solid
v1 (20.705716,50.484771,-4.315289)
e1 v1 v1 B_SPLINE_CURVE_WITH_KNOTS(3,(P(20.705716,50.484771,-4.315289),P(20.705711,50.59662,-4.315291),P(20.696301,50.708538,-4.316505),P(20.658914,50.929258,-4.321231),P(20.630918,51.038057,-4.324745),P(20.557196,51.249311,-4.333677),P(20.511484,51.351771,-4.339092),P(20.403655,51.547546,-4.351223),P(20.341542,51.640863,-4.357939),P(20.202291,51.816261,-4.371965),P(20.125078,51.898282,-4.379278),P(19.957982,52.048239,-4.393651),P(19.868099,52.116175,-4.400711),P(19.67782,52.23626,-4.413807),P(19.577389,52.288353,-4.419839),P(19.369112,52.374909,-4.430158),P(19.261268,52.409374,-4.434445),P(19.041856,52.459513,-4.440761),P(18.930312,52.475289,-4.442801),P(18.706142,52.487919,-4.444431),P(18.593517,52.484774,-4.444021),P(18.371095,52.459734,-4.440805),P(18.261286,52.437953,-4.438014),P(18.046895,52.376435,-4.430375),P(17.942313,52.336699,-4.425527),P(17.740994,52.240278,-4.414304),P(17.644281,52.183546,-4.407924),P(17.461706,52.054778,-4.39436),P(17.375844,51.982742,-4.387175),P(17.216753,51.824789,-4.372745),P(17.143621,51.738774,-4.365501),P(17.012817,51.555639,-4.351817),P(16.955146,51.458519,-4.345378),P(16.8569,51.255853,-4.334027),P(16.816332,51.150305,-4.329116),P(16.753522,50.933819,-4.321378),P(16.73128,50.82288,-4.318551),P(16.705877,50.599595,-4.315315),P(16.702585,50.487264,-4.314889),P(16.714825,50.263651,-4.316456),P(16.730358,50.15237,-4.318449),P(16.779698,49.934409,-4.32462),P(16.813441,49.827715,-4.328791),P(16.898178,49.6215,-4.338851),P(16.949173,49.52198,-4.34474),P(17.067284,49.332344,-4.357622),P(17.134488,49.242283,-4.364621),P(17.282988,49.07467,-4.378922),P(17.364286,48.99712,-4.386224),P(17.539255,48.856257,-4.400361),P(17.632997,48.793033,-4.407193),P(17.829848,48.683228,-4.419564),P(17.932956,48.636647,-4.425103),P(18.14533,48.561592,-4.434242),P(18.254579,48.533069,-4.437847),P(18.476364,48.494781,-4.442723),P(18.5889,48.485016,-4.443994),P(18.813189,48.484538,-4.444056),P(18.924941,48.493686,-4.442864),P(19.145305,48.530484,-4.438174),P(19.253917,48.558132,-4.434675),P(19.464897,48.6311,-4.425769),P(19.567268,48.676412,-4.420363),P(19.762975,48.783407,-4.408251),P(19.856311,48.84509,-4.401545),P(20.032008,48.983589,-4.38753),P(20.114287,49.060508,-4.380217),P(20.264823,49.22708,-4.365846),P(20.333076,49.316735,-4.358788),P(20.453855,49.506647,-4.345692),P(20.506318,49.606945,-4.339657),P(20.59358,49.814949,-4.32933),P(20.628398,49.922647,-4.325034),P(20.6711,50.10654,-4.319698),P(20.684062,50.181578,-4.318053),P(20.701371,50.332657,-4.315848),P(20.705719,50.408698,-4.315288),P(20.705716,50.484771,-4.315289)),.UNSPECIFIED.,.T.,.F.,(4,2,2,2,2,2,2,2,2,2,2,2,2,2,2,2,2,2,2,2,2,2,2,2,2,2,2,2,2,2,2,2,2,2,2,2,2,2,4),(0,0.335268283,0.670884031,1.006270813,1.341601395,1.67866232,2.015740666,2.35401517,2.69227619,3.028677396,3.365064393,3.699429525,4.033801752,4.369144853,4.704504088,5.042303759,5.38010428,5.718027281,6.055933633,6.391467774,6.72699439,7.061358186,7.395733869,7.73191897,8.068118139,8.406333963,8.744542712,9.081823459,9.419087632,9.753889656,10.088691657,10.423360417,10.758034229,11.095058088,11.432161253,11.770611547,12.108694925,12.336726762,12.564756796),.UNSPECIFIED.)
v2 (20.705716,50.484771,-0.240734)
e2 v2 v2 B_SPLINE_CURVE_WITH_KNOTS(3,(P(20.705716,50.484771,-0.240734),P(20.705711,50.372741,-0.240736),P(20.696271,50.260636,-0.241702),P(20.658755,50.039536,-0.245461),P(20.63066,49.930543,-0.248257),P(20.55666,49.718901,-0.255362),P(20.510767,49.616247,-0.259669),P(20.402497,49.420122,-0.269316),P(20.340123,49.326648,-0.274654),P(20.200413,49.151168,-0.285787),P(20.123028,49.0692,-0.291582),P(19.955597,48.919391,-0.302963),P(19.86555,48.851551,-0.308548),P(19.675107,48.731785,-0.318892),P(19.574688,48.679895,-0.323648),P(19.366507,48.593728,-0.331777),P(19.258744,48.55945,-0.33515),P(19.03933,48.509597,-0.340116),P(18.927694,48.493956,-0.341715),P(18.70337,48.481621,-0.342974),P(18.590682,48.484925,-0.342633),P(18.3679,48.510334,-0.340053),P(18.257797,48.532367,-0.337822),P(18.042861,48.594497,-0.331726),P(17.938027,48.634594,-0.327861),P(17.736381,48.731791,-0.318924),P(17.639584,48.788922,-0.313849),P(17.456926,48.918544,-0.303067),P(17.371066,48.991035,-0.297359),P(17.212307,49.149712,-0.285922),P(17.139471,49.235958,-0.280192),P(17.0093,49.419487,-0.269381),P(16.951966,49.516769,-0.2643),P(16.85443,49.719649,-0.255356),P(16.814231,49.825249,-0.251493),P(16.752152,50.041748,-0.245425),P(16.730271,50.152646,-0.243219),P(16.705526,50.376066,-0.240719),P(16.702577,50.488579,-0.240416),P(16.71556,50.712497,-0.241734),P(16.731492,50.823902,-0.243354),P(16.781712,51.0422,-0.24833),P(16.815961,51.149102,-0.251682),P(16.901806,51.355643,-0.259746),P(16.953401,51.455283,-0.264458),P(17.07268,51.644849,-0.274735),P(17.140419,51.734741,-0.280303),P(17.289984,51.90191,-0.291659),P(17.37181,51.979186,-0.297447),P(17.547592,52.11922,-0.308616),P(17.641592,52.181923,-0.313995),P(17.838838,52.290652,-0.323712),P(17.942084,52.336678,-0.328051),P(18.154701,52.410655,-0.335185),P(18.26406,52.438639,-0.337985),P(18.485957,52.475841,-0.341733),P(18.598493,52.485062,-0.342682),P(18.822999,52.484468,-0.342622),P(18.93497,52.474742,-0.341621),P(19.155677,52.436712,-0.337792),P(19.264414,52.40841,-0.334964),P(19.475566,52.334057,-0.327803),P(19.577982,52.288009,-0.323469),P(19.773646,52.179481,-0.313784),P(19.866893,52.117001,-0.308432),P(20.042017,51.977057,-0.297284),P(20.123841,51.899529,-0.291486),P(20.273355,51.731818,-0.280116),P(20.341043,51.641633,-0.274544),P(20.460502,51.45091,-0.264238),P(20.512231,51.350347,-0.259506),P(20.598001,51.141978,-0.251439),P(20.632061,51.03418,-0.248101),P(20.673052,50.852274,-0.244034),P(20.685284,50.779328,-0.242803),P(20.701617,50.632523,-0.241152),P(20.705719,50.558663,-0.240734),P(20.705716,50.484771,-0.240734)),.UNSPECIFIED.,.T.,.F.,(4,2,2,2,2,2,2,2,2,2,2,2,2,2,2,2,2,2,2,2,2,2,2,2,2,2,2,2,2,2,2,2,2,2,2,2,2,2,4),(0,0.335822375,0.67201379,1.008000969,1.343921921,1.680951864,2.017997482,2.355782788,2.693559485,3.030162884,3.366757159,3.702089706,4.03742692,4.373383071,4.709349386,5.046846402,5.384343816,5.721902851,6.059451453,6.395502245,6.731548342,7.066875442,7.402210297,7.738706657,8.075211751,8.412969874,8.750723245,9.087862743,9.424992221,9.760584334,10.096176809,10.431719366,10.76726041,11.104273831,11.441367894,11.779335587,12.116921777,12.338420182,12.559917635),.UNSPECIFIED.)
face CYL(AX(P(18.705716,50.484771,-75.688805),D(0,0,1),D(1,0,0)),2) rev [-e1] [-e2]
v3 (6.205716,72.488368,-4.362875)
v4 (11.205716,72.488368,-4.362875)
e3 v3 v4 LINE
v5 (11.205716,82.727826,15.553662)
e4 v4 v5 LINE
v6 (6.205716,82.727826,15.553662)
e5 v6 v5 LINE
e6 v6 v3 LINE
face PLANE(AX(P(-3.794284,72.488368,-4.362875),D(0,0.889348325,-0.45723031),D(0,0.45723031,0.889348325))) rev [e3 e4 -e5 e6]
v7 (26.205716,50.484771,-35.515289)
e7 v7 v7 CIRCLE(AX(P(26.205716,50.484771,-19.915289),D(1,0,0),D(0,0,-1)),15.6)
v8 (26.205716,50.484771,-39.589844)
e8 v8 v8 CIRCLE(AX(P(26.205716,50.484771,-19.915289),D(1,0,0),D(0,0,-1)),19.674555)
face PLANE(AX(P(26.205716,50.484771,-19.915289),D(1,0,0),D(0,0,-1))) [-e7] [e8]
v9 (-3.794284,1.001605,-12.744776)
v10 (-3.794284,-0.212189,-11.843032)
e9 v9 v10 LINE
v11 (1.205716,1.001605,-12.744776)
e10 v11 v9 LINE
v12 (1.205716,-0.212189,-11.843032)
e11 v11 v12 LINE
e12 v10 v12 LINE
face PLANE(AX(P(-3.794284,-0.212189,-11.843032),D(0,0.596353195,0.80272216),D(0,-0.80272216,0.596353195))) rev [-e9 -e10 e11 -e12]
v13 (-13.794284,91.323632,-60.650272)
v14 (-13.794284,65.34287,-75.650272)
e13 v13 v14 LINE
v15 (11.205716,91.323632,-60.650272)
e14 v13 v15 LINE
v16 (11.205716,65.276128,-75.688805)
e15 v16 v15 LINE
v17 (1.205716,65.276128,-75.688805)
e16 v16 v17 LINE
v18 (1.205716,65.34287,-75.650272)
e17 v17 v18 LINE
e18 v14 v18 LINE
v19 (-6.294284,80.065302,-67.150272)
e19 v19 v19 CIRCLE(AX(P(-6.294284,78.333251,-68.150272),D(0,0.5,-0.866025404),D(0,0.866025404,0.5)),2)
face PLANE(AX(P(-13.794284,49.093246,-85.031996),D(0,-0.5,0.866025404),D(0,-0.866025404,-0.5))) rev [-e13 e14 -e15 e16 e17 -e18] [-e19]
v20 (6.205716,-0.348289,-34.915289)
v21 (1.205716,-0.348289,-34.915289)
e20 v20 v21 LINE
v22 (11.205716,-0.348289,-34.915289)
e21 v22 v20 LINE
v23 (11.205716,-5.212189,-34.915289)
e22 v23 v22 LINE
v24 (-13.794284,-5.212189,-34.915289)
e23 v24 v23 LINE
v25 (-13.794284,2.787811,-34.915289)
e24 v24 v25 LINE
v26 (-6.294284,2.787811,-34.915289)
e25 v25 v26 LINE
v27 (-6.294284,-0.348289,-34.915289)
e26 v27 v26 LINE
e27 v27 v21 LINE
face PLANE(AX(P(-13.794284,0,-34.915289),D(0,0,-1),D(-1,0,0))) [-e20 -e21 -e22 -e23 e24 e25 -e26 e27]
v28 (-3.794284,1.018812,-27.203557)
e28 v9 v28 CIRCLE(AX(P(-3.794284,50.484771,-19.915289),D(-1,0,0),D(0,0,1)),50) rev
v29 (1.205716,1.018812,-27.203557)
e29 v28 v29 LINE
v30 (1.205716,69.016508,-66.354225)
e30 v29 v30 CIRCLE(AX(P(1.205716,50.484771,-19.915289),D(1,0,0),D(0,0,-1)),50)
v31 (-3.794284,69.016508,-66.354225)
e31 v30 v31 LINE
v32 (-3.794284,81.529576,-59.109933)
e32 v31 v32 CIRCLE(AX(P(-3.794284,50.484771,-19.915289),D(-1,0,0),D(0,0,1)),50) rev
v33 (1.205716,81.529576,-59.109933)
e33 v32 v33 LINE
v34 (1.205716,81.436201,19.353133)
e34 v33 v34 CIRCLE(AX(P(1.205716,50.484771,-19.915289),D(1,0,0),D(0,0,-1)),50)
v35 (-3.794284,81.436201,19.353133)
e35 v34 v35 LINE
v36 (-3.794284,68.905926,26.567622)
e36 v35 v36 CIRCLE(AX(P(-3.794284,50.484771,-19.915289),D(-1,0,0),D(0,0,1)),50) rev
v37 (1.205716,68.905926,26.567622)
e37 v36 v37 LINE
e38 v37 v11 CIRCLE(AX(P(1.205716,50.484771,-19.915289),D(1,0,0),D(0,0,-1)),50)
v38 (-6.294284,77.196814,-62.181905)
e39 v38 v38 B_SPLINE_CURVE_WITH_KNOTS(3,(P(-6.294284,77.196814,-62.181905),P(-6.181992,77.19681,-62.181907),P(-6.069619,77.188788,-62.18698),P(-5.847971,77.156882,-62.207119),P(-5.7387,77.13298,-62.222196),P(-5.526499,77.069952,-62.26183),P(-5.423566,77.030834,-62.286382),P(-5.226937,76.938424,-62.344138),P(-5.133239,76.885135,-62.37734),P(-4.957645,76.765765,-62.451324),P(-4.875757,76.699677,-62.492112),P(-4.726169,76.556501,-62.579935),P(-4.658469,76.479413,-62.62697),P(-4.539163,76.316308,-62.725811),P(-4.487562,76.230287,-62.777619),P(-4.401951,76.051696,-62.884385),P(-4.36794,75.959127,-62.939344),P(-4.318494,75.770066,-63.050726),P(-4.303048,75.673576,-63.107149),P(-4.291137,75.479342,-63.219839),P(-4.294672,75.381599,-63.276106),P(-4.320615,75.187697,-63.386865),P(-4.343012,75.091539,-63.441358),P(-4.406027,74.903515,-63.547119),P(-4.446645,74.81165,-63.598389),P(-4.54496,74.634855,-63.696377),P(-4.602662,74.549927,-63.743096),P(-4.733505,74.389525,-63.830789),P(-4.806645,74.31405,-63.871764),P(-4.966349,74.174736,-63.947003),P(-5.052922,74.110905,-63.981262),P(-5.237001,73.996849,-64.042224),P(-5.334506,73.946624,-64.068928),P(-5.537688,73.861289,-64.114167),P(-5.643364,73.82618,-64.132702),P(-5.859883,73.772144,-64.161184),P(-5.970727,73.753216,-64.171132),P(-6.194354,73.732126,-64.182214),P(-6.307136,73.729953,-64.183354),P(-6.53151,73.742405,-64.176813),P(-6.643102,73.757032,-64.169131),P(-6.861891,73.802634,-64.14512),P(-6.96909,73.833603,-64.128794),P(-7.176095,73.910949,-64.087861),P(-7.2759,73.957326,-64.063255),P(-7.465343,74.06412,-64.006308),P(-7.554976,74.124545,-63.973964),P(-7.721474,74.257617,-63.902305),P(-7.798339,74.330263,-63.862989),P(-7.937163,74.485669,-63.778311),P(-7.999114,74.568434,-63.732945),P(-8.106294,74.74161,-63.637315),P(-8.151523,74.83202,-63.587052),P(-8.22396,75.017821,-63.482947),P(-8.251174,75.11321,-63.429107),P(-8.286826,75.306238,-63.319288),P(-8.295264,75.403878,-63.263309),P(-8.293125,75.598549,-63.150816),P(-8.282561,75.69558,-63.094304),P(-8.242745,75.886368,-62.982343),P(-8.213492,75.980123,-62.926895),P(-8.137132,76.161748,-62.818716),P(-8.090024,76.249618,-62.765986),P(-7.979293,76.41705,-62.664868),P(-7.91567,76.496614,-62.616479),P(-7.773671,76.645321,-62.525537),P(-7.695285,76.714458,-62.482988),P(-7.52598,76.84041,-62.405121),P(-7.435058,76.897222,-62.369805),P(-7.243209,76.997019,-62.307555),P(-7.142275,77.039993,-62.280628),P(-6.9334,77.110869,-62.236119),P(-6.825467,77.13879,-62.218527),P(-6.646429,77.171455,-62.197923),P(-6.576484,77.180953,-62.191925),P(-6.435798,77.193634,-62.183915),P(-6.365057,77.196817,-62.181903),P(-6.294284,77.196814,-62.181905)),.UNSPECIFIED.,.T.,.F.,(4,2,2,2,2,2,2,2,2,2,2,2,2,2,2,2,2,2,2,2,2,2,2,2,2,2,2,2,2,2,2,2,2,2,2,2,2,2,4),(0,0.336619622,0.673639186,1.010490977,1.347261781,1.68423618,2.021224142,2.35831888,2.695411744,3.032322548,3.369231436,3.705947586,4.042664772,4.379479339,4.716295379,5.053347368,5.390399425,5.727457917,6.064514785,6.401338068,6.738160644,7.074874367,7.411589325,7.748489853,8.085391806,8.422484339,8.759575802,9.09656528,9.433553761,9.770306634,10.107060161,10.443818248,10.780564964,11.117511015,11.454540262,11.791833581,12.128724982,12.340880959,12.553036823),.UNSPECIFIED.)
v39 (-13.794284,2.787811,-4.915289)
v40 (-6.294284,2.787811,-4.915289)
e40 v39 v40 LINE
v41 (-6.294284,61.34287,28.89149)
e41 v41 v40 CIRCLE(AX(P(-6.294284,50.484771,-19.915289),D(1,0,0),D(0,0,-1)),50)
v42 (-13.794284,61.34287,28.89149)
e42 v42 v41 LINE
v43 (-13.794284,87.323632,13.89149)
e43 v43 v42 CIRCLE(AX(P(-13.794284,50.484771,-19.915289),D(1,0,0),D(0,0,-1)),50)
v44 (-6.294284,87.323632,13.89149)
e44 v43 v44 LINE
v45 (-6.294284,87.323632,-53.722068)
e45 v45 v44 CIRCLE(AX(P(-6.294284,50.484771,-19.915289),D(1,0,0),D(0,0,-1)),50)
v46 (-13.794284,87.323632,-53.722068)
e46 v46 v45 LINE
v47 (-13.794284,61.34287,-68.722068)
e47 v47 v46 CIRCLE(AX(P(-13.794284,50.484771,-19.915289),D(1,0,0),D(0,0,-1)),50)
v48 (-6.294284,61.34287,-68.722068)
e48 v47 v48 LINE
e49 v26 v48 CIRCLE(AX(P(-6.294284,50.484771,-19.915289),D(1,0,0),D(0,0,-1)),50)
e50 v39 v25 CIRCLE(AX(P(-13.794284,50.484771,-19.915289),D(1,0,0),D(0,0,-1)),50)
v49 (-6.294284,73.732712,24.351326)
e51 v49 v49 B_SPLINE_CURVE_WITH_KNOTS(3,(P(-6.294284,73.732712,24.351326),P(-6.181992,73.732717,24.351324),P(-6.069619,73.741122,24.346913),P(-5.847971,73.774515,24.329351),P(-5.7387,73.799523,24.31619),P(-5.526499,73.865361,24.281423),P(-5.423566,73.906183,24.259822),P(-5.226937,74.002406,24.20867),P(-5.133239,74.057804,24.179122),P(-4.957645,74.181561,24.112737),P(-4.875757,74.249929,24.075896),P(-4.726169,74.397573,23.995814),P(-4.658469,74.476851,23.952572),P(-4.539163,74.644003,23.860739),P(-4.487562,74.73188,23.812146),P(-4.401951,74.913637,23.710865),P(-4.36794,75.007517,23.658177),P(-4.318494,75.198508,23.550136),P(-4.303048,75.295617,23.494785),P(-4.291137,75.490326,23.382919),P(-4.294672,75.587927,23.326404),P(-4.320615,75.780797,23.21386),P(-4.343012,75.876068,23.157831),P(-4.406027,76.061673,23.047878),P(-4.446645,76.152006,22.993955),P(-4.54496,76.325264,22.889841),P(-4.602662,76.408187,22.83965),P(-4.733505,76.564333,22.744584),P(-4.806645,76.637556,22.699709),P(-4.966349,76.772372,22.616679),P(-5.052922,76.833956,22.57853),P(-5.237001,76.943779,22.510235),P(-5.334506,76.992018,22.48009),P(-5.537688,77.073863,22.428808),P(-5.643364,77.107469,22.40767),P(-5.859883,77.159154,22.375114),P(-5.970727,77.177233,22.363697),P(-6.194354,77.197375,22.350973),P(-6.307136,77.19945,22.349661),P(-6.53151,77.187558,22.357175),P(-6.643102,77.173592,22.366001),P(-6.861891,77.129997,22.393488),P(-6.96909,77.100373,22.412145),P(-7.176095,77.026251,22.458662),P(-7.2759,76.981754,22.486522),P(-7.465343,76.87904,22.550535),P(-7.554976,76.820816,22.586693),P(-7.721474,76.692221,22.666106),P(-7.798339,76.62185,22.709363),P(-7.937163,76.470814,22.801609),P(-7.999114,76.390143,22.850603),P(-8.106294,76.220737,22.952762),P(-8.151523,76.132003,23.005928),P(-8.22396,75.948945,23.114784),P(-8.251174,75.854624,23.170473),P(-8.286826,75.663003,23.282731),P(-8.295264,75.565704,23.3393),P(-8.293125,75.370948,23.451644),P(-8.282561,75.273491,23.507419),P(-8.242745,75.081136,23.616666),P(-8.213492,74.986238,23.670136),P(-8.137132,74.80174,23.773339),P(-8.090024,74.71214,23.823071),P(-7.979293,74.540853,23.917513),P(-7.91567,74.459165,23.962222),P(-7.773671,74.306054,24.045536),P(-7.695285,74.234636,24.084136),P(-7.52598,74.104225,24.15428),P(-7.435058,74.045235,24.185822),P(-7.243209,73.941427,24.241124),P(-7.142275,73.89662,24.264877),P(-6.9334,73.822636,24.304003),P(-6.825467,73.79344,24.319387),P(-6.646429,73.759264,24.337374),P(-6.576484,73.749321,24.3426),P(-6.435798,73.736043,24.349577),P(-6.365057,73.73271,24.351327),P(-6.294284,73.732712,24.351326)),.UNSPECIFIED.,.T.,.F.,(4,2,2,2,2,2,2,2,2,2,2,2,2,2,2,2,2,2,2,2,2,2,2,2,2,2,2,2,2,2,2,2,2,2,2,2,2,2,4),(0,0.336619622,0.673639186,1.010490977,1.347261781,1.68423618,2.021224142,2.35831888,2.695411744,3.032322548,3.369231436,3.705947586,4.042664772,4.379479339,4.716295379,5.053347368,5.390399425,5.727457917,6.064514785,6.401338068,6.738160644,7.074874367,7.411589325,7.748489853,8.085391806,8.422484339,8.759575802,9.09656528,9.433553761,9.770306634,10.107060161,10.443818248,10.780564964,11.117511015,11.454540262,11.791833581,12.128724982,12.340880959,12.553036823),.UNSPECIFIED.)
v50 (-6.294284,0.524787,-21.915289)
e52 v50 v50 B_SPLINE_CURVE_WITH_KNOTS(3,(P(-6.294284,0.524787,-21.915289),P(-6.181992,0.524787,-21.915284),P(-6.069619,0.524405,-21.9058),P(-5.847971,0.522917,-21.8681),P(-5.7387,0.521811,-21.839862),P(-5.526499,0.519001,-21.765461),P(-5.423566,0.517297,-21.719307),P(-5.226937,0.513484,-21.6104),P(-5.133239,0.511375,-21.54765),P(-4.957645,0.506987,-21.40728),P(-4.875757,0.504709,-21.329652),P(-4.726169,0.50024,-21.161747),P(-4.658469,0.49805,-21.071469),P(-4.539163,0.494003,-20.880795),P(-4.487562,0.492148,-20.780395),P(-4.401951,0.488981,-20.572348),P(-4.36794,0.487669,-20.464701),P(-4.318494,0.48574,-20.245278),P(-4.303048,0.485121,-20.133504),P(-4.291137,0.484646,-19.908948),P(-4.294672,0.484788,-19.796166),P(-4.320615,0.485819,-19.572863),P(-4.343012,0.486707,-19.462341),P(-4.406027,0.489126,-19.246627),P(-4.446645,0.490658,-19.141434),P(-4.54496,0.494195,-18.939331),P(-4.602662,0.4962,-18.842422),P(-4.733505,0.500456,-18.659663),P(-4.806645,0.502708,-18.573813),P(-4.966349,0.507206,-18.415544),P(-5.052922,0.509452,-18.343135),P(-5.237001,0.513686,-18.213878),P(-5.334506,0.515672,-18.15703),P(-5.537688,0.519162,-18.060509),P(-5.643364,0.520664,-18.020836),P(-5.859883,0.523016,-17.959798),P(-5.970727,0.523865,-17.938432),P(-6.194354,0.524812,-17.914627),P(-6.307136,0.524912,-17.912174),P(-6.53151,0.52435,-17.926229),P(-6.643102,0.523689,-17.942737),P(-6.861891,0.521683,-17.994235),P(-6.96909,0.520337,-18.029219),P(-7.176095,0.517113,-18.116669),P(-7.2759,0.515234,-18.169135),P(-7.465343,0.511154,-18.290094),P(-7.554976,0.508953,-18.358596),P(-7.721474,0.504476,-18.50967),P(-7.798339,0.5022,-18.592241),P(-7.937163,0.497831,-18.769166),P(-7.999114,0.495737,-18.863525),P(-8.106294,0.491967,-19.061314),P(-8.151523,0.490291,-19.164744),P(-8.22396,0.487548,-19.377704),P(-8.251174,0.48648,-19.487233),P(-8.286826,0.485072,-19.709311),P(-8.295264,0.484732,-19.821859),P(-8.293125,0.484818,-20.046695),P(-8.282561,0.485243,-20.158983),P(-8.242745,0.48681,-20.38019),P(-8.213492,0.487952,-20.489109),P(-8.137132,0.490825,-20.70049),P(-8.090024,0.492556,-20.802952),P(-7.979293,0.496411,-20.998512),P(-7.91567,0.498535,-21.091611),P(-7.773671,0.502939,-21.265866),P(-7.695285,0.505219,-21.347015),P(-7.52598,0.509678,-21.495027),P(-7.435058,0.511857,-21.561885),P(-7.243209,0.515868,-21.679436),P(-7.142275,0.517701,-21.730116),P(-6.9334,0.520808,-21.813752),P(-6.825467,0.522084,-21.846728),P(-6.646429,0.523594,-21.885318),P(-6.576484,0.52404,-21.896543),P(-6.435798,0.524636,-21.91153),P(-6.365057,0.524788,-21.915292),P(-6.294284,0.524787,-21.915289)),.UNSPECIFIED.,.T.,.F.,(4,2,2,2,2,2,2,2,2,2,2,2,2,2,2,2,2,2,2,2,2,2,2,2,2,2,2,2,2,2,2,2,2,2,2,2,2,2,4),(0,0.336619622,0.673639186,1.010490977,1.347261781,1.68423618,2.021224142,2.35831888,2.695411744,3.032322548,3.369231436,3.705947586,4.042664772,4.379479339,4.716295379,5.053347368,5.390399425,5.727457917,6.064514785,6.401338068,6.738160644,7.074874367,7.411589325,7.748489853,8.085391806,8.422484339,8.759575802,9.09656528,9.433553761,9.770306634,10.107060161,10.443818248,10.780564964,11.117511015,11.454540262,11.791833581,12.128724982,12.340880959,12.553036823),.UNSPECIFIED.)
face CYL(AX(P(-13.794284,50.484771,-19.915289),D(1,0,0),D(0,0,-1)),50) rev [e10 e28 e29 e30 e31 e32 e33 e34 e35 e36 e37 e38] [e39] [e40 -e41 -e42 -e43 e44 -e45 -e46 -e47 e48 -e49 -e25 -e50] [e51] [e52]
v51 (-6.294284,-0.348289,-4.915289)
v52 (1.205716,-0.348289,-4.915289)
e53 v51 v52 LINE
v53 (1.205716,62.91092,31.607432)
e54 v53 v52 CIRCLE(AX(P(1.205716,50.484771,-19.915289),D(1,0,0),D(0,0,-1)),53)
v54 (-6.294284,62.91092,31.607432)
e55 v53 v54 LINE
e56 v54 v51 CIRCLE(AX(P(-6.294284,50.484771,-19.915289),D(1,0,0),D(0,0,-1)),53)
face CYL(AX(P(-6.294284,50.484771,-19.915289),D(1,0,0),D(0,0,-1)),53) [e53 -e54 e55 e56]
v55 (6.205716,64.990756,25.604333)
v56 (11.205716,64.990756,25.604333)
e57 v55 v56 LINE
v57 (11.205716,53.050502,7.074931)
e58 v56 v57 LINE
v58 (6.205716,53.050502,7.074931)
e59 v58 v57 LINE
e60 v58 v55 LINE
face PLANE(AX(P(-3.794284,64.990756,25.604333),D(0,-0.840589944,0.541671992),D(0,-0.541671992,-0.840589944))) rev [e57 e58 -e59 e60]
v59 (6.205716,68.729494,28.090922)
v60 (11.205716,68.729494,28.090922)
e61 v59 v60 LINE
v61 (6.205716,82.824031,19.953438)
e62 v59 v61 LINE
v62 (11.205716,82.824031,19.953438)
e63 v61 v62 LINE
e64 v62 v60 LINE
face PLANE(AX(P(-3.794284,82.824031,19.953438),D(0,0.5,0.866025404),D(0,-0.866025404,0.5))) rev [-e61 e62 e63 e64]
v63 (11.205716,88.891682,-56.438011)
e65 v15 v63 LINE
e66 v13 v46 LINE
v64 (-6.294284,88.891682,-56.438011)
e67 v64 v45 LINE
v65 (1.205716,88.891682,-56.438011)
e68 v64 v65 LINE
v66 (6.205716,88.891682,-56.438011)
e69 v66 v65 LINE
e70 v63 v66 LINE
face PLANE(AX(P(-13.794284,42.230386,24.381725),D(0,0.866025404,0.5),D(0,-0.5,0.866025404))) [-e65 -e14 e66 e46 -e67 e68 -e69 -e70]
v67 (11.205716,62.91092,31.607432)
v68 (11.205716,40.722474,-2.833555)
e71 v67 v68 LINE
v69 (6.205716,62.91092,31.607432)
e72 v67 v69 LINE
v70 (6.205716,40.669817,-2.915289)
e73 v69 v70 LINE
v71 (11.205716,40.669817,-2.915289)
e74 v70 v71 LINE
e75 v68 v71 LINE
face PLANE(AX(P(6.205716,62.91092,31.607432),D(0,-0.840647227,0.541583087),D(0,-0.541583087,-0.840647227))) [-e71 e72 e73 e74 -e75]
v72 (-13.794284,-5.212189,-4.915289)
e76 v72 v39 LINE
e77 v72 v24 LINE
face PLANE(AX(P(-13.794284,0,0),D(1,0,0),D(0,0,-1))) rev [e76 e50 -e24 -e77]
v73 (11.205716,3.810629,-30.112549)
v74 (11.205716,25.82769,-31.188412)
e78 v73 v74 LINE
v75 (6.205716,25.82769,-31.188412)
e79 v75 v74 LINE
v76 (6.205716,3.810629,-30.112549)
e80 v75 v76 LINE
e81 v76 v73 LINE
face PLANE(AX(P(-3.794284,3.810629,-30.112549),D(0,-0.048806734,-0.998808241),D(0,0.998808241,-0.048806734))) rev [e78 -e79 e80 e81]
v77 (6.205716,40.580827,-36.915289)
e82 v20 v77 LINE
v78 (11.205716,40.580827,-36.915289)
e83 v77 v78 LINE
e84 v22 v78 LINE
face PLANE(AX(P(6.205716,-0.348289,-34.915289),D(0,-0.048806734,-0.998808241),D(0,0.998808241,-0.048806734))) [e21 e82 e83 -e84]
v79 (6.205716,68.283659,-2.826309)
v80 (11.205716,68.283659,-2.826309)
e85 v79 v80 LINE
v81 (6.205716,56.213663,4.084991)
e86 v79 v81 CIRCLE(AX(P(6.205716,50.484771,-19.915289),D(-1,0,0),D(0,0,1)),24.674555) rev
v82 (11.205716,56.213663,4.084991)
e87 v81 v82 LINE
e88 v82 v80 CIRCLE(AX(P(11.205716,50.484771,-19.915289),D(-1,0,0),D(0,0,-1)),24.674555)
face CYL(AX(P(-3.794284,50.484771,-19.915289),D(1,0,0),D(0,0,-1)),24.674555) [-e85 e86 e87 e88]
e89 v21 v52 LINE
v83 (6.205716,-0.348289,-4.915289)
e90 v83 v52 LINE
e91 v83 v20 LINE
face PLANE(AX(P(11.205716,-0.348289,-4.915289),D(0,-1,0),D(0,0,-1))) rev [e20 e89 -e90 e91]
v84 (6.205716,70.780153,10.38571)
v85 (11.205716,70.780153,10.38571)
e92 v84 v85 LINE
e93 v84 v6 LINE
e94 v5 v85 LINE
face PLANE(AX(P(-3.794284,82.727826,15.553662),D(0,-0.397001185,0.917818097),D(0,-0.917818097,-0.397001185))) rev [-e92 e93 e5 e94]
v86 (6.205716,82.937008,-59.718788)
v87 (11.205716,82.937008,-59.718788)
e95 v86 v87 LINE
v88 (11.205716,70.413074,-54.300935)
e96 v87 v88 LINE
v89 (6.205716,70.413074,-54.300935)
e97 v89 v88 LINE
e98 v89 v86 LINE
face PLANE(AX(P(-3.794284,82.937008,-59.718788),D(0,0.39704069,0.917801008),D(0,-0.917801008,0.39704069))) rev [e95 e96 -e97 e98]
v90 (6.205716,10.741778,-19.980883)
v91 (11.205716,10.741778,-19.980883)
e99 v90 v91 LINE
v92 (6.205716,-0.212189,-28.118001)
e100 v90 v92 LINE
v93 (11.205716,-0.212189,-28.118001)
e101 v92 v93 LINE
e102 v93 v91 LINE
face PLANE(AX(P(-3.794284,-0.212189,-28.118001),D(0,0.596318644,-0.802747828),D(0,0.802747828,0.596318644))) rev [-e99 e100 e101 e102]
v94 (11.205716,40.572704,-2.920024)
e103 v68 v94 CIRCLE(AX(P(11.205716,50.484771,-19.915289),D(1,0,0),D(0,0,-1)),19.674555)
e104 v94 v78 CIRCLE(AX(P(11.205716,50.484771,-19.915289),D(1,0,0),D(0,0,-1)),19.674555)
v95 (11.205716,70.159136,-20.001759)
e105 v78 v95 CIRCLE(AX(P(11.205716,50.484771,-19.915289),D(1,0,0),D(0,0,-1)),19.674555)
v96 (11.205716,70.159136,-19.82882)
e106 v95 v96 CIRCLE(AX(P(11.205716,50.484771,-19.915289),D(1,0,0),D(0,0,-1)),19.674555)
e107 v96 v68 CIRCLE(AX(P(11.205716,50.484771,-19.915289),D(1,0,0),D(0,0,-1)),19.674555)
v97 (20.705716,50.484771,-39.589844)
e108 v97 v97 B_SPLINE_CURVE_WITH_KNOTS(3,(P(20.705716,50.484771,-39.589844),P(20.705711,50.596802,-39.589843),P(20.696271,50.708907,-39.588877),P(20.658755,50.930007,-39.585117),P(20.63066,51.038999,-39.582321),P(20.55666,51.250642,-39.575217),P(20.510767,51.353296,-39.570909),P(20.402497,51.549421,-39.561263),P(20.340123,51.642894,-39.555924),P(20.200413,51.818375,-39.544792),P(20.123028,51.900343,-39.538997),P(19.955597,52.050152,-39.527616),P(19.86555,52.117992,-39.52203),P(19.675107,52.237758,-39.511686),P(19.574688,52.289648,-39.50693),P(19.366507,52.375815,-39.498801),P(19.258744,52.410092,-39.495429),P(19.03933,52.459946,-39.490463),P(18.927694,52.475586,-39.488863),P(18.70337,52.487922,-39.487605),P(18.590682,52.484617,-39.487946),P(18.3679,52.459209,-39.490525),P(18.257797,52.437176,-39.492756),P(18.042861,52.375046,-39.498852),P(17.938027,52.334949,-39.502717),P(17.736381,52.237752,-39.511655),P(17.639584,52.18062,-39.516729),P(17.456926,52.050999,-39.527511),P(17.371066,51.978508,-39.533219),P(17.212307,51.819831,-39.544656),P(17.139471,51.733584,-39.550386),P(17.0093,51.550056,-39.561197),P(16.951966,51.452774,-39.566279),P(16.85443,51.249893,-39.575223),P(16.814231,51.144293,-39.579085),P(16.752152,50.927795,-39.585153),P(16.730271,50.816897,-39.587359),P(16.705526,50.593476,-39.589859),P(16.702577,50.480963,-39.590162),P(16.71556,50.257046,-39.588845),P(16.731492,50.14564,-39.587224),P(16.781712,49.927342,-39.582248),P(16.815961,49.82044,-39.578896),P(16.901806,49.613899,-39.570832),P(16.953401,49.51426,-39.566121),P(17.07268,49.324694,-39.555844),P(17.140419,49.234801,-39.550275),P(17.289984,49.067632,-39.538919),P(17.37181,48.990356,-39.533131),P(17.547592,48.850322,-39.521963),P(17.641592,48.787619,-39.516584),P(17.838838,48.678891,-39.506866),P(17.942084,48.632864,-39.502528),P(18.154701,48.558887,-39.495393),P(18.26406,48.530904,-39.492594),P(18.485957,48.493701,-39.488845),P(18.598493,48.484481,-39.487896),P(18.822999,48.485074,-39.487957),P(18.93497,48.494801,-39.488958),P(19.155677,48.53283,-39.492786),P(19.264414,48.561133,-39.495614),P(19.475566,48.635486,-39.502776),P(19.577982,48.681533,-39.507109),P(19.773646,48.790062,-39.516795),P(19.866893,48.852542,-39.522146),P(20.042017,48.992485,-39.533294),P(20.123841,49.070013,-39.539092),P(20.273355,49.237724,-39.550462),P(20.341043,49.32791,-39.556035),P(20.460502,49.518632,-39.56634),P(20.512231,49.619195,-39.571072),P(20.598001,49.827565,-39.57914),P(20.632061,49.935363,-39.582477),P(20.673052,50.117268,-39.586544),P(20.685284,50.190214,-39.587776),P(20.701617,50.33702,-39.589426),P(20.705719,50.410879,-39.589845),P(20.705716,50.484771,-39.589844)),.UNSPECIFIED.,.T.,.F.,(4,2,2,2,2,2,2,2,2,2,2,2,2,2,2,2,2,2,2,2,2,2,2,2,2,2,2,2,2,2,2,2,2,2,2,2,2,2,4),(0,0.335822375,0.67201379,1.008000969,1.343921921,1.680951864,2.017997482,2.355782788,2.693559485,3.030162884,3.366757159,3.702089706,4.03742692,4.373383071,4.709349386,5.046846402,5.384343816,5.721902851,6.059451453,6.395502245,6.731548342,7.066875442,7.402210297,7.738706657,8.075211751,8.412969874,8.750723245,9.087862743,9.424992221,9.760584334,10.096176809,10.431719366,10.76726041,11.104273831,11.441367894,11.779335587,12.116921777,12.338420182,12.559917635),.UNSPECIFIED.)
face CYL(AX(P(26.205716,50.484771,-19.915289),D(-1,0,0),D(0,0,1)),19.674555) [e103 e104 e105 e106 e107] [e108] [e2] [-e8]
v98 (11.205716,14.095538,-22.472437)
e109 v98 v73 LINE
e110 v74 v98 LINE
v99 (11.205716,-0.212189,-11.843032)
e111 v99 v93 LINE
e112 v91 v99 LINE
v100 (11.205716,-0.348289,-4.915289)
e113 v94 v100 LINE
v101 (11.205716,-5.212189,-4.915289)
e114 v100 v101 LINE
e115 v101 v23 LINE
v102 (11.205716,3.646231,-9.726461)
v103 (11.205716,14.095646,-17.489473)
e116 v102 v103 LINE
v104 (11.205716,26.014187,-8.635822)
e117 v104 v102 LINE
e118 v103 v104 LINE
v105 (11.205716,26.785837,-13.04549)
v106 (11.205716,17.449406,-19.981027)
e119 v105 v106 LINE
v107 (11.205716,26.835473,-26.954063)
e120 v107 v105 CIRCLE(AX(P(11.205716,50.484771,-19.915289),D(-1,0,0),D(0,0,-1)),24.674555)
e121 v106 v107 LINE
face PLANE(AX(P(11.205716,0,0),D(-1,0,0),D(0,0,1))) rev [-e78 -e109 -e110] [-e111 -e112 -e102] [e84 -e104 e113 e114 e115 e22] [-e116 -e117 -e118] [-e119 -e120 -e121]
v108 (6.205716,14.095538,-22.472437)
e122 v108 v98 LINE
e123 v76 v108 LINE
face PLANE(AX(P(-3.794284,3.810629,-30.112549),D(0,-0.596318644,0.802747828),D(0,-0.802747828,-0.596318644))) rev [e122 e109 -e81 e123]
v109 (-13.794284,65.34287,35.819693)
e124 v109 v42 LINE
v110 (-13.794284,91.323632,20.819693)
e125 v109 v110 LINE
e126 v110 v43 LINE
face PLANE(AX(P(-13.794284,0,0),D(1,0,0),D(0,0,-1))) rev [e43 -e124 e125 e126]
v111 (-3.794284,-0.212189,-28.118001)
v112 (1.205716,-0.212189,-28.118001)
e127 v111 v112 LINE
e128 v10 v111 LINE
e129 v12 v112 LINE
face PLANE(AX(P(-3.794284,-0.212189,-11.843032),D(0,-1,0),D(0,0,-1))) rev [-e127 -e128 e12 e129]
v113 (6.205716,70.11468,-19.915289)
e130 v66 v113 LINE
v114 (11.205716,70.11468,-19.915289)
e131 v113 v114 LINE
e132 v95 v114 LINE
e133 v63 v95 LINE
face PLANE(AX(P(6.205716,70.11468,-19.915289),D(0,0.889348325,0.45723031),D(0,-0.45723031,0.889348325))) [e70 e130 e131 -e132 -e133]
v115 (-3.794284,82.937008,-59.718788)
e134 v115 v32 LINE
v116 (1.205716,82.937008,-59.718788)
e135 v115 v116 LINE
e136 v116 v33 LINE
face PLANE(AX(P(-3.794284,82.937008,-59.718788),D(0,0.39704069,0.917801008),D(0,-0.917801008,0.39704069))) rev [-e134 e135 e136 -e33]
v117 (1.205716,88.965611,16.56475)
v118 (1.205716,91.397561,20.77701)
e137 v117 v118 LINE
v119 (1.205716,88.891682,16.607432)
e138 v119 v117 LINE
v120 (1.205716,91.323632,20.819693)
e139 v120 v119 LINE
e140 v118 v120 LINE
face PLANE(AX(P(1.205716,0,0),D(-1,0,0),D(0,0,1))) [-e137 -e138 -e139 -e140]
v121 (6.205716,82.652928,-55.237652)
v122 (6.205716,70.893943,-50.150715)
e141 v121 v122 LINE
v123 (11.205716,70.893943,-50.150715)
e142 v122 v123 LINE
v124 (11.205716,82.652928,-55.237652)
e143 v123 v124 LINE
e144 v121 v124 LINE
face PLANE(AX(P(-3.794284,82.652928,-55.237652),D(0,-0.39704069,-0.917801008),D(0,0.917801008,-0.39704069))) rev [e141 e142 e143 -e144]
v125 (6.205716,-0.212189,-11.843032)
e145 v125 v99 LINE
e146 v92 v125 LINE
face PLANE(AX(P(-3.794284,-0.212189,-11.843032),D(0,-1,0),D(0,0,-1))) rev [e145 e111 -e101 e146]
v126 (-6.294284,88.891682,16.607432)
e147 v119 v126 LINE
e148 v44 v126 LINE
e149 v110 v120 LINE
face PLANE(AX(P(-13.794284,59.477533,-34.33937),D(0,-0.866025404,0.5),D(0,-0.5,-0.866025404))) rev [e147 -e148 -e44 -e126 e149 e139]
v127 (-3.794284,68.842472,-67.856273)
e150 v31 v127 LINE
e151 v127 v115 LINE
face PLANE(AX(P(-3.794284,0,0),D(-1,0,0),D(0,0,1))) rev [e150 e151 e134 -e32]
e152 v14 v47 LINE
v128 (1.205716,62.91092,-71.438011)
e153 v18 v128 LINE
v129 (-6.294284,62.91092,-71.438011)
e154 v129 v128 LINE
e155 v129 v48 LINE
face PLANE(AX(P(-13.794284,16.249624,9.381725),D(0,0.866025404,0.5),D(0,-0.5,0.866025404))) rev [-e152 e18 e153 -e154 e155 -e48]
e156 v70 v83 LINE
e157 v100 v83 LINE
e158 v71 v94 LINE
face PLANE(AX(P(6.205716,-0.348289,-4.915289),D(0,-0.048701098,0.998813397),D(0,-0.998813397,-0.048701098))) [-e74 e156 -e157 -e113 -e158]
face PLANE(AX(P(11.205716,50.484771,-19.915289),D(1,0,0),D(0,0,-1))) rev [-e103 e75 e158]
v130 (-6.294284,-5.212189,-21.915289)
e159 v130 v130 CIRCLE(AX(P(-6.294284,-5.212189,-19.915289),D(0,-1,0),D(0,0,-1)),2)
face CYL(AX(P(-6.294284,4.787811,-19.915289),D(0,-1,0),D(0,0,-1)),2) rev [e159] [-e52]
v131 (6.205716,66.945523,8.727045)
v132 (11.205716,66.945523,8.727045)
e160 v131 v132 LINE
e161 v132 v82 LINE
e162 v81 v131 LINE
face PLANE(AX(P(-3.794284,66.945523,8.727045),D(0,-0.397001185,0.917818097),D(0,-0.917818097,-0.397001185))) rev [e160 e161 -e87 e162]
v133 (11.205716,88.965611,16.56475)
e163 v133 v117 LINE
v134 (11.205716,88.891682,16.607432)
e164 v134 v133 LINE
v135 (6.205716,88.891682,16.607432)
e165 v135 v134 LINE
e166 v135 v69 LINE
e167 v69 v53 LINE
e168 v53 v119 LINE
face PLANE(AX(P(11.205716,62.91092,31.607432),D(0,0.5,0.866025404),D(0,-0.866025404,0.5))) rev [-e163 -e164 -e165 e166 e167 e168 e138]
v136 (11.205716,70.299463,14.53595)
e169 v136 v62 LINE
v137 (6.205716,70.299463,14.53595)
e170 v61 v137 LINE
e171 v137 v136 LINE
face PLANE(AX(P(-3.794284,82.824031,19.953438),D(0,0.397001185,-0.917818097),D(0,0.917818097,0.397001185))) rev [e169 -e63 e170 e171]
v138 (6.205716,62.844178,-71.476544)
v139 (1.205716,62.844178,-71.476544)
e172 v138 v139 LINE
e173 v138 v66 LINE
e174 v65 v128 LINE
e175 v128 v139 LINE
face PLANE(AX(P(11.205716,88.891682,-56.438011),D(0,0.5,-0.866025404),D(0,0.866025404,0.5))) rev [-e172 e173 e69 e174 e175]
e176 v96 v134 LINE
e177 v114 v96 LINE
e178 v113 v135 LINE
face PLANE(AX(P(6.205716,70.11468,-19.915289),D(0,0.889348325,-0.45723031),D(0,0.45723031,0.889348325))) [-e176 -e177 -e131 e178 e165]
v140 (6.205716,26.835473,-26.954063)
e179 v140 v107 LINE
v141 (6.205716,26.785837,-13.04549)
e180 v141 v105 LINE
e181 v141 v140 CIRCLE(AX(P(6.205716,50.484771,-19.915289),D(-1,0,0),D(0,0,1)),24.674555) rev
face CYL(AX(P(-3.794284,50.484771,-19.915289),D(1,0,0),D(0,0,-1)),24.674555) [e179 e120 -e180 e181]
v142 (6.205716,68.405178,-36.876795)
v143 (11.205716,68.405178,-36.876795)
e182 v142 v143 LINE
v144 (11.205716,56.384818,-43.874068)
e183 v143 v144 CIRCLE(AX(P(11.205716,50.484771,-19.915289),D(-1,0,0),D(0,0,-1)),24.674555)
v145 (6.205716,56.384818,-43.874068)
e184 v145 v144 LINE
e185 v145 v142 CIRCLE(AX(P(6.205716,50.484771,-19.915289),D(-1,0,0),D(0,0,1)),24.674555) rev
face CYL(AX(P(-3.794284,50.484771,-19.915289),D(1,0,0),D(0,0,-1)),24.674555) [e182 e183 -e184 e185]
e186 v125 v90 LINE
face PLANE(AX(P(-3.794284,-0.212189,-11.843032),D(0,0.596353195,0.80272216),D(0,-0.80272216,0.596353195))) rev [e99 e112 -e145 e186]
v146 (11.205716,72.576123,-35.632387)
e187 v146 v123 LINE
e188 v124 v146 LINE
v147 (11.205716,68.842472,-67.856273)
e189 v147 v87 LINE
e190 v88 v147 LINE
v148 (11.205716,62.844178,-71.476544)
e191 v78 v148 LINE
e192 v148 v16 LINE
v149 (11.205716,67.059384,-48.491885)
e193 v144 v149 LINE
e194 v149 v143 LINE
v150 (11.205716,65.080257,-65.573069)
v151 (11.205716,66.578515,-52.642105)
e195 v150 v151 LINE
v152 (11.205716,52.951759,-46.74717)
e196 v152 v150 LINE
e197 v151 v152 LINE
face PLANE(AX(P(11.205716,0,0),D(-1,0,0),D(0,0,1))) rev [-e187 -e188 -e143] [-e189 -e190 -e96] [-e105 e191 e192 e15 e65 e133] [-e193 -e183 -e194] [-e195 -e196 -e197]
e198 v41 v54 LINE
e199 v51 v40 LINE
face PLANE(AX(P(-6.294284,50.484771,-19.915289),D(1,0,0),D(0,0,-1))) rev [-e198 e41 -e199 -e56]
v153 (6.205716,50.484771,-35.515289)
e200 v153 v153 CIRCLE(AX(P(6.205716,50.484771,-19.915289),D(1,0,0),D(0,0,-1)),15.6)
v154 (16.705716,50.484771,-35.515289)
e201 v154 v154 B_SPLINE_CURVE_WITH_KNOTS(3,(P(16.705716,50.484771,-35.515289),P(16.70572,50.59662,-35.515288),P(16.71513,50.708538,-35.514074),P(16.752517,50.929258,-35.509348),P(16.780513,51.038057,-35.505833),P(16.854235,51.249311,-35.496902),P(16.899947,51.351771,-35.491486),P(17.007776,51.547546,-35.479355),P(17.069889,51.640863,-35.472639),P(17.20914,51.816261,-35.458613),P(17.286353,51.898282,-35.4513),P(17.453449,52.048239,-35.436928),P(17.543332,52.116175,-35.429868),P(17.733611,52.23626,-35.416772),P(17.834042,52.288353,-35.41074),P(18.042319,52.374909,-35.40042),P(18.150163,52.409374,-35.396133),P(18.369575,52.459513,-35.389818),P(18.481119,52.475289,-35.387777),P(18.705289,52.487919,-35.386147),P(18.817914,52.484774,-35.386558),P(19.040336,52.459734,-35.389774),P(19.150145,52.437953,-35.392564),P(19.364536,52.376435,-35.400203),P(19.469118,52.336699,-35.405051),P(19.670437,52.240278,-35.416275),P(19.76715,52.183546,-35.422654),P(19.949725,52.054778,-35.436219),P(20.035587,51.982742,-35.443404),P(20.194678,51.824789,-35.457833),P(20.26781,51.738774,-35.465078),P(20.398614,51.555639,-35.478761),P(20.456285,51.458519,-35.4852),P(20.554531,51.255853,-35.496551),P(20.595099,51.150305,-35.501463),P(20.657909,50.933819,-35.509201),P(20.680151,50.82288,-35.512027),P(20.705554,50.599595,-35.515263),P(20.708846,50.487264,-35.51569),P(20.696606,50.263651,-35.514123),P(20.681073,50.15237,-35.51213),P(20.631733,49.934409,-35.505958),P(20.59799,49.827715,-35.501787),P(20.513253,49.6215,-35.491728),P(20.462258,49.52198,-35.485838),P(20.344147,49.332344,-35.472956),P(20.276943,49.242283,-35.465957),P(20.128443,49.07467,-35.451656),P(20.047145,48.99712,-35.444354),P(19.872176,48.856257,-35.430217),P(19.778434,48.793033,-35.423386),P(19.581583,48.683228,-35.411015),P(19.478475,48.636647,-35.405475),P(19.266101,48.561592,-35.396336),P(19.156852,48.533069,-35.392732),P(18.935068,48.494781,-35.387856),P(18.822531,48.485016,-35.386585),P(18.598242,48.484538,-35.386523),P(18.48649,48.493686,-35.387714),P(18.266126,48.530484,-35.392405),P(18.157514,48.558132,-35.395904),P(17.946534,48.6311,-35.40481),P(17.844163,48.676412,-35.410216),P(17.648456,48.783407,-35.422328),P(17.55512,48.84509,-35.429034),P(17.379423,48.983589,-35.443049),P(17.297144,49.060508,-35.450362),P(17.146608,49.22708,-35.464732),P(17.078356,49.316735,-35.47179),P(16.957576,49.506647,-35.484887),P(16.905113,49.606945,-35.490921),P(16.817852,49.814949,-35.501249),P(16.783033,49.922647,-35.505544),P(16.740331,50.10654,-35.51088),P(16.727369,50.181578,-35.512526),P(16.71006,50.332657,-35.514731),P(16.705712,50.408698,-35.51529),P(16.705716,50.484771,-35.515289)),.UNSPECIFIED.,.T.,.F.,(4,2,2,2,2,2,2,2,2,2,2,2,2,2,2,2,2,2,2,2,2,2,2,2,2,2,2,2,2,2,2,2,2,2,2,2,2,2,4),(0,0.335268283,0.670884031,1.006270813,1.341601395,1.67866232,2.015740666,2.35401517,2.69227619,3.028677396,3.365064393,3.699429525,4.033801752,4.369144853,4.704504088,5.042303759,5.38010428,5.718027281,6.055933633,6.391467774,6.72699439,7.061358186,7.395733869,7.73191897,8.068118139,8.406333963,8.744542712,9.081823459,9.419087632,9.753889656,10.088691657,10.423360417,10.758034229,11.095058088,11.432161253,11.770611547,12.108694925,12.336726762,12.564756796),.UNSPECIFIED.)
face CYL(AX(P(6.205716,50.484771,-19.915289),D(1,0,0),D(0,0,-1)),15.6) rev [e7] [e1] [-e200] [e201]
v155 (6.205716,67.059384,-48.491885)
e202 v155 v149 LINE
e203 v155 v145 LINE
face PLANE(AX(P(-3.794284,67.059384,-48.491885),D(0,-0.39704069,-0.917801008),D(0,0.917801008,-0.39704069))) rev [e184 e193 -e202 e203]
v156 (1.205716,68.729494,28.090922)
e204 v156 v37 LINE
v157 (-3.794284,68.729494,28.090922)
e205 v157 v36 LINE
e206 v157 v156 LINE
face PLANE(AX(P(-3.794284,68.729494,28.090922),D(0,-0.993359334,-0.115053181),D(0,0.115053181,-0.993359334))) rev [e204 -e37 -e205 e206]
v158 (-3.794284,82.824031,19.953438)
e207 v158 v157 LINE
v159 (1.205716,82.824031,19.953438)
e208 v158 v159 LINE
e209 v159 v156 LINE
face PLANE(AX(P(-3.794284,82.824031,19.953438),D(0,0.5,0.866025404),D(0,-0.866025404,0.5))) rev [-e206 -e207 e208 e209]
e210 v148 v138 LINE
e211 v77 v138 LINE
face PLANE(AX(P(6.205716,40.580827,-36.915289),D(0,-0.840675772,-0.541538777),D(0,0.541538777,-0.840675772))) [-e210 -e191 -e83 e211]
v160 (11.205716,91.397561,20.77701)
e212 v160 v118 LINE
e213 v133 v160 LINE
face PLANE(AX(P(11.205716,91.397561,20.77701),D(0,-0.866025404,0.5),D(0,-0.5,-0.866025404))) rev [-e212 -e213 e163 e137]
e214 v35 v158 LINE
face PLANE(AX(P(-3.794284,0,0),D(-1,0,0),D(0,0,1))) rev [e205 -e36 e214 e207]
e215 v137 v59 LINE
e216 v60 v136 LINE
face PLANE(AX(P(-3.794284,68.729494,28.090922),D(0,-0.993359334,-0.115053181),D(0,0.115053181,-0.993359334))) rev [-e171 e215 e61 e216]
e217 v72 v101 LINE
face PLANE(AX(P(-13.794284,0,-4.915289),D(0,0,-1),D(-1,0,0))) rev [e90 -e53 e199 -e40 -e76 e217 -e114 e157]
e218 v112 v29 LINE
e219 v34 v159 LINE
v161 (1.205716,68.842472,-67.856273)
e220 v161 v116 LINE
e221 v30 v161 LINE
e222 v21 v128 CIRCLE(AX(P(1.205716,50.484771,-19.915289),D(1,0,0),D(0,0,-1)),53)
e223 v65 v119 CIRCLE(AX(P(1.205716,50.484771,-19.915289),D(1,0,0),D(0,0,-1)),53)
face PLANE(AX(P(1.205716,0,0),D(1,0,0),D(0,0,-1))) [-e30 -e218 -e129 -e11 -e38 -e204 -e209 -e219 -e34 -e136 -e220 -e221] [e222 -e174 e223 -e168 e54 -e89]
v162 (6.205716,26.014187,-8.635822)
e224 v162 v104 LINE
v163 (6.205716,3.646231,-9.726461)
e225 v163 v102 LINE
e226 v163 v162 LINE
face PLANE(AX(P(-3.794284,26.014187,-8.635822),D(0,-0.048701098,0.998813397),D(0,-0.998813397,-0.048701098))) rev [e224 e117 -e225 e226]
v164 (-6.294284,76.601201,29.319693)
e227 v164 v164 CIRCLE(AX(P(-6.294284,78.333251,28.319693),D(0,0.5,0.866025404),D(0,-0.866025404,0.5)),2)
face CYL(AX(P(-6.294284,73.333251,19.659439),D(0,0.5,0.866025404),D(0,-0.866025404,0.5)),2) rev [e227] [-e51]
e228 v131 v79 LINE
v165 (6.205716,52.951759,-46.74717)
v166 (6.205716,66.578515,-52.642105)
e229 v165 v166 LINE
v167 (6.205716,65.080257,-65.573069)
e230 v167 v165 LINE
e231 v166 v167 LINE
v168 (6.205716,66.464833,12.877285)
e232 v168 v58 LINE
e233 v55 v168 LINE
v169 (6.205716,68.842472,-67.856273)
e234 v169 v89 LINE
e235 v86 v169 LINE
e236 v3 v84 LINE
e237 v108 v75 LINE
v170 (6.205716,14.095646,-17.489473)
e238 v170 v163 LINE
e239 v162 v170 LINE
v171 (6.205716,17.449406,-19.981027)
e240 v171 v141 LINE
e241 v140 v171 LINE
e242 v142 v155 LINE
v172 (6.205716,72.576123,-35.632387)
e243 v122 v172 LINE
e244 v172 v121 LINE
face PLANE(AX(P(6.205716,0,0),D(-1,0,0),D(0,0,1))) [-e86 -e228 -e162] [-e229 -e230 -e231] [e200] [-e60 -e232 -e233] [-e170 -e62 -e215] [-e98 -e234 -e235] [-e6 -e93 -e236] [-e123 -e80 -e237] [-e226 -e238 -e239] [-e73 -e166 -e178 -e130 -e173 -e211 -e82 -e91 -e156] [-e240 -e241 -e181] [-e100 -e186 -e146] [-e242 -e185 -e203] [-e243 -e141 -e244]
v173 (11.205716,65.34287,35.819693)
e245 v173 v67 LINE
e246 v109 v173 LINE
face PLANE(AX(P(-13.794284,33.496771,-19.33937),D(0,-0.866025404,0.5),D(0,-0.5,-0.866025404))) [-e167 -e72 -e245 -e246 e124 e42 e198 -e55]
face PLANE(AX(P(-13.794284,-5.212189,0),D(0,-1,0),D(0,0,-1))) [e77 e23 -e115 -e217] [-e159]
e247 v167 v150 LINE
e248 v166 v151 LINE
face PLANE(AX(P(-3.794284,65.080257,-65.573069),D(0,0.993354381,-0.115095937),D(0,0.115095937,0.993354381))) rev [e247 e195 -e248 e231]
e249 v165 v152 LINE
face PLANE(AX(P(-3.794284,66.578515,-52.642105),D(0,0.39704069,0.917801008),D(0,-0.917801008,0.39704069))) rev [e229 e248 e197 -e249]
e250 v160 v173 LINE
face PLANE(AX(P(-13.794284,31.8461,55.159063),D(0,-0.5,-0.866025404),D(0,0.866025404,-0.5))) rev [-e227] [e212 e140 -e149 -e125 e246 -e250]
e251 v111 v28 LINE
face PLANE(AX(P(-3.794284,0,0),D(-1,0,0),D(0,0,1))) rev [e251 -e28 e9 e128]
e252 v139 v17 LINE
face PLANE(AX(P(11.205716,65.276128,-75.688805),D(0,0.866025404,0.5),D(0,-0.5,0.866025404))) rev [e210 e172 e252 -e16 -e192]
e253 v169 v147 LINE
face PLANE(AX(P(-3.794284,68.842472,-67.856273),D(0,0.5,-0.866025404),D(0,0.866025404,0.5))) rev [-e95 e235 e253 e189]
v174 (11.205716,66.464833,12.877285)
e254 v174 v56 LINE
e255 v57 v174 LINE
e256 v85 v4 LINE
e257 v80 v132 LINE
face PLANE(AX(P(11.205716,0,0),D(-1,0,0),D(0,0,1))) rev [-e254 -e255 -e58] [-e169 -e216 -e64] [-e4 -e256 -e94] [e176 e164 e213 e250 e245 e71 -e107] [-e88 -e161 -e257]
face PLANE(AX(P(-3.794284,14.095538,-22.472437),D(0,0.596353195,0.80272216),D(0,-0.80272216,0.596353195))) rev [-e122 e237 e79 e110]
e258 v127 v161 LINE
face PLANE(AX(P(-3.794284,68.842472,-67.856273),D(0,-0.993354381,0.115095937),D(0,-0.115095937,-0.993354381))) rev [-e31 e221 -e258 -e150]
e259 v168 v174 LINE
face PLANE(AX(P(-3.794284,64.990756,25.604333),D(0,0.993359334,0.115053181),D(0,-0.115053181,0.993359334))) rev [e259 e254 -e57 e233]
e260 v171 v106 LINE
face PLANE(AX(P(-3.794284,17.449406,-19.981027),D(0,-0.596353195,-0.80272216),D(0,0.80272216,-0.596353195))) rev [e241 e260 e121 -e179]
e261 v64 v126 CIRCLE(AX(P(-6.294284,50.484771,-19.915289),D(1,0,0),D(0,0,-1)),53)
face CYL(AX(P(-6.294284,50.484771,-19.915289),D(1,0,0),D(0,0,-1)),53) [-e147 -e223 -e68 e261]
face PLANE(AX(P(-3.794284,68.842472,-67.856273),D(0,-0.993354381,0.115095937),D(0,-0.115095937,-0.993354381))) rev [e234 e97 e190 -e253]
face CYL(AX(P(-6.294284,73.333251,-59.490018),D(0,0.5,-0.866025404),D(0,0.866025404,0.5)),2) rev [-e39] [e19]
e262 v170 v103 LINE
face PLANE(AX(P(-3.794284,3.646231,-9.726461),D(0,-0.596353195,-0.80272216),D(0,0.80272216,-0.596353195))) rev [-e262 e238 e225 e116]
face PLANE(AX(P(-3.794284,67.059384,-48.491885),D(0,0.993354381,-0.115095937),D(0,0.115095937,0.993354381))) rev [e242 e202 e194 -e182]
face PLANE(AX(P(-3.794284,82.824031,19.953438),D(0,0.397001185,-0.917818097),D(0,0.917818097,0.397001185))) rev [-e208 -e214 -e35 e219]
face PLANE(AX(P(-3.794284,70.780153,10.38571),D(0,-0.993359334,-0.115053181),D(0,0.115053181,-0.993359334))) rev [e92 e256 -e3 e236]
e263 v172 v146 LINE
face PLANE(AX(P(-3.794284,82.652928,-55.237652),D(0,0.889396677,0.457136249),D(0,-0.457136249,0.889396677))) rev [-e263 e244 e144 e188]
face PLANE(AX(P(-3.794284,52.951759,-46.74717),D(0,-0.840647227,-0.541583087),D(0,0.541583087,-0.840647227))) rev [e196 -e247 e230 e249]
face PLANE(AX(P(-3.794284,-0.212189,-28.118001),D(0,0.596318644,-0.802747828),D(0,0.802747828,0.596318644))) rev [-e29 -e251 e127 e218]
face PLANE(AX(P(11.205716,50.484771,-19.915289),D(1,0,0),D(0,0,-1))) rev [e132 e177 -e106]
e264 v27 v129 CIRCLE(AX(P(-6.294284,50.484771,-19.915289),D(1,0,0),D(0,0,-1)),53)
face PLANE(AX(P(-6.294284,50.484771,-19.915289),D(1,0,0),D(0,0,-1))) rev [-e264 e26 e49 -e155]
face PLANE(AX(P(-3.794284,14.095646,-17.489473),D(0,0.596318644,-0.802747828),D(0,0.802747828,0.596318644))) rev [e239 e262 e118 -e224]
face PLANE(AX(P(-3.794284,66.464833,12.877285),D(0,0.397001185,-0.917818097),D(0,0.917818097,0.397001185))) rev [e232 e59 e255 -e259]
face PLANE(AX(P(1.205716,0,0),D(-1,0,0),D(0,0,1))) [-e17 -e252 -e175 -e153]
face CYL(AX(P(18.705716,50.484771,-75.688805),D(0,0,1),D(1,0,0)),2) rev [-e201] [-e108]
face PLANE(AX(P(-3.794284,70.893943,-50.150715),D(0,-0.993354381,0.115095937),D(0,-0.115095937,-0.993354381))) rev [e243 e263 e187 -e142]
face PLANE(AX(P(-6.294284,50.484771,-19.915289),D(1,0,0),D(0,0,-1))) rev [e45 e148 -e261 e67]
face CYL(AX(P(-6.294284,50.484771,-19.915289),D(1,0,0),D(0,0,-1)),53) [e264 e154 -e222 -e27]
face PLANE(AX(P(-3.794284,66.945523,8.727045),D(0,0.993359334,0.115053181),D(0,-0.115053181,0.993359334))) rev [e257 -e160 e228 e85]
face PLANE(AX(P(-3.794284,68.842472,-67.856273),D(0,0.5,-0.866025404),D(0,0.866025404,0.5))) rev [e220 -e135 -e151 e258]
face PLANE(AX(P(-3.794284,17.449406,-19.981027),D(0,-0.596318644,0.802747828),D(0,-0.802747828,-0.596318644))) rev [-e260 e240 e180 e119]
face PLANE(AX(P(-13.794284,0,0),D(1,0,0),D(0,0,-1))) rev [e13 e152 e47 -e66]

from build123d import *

# Parameters (mm, degrees)
EXTRUDE_START       = -15
EXTRUDE_1_DEPTH     = 15
EXTRUDE_START_2     = -7.5
SKETCH_2_R          = 53
SKETCH_2_R_2        = 50
EXTRUDE_2_DEPTH     = 7.5
SKETCH_3_R          = 2
CUT_EXTRUDE_1_DEPTH = 10
SKETCH_4_R          = 2
CUT_EXTRUDE_2_DEPTH = 10
SKETCH_5_R          = 2
CUT_EXTRUDE_3_DEPTH = 10
SKETCH_6_W          = 30
SKETCH_6_H          = 4.863899963
EXTRUDE_3_DEPTH     = 10
SKETCH_7_R          = 15.6
EXTRUDE_4_DEPTH     = 5
EXTRUDE_START_3     = 15
SKETCH_8_R          = 19.674554727
SKETCH_8_R_2        = 15.6
EXTRUDE_5_DEPTH     = 15
SKETCH_9_R          = 2
CUT_EXTRUDE_4_DEPTH = 131.86111959
CUT_EXTRUDE_5_DEPTH = 15


# Read off the part's stored shape, not the designer's step: 填料-伸長1
with BuildPart() as part:
    # 填料-伸長1 outline → 填料-伸長1 (new body)
    with BuildSketch(Plane(origin=(1.20571551, 0, 0), x_dir=(0, 0, -1), z_dir=(1, 0, 0)).offset(EXTRUDE_START)):
        with BuildLine():
            ThreePointArc((-28.891489898, 61.342870268), (-23.385980983, 75.484771289), (-13.891489898, 87.323632381))
            Line((-13.891489898, 87.323632381), (-20.819693129, 91.323632381))
            Line((-20.819693129, 91.323632381), (-35.819693129, 65.342870268))
            Line((-35.819693129, 65.342870268), (-28.891489898, 61.342870268))
        make_face()
        with BuildLine():
            ThreePointArc((34.915289206, 2.787811218), (19.915289206, 0.484771289), (4.915289206, 2.787811218))
            Line((4.915289206, 2.787811218), (4.915289206, -5.212188782))
            Line((4.915289206, -5.212188782), (34.915289206, -5.212188782))
            Line((34.915289206, -5.212188782), (34.915289206, 2.787811218))
        make_face()
        with BuildLine():
            ThreePointArc((53.722068311, 87.323632381), (63.216559396, 75.484771289), (68.722068311, 61.342870268))
            Line((68.722068311, 61.342870268), (75.650271541, 65.342870268))
            Line((75.650271541, 65.342870268), (60.650271541, 91.323632381))
            Line((60.650271541, 91.323632381), (53.722068311, 87.323632381))
        make_face()
    extrude(amount=EXTRUDE_1_DEPTH)

    # 草圖2 → 填料-伸長2 (add)
    with BuildSketch(Plane(origin=(1.20571551, 0, 0), x_dir=(0, 0, -1), z_dir=(1, 0, 0)).offset(EXTRUDE_START_2)):
        with Locations((19.915289206, 50.484771289)):
            Circle(SKETCH_2_R)
        with Locations((19.915289206, 50.484771289)):
            Circle(SKETCH_2_R_2, mode=Mode.SUBTRACT)
    extrude(amount=EXTRUDE_2_DEPTH)

    # 草圖3 → 除料-伸長1 (cut)
    with BuildSketch(Plane(origin=(0, 31.846099669, 55.15906265), x_dir=(1, 0, 0), z_dir=(0, 0.5000000000000088, 0.8660254037844337))):
        with Locations(Location((-6.29428449, 53.678739044, 0), (0, 0, 270))):
            Circle(SKETCH_3_R)
    extrude(amount=-CUT_EXTRUDE_1_DEPTH, mode=Mode.SUBTRACT)

    # 草圖4 → 除料-伸長2 (cut)
    with BuildSketch(Plane.XZ.offset(5.212188782)):
        with Locations(Location((-6.29428449, -19.915289206, 0), (0, 0, 270))):
            Circle(SKETCH_4_R)
    extrude(amount=-CUT_EXTRUDE_2_DEPTH, mode=Mode.SUBTRACT)

    # 草圖5 → 除料-伸長3 (cut)
    with BuildSketch(Plane(origin=(0, 49.093246046, -85.03199646), x_dir=(-1, 0, 0), z_dir=(0, 0.5000000000000044, -0.8660254037844362))):
        with Locations(Location((6.29428449, 33.763449837, 0), (0, 0, 90))):
            Circle(SKETCH_5_R)
    extrude(amount=-CUT_EXTRUDE_3_DEPTH, mode=Mode.SUBTRACT)

    # 草圖6 → 填料-伸長3 (add)
    with BuildSketch(Plane(origin=(1.20571551, 0, 0), x_dir=(0, 0, -1), z_dir=(1, 0, 0))):
        Polygon((-35.819693129, 65.342870268), (-31.6074322, 62.910920287), (-16.564749505, 88.965610996), (-20.777010434, 91.397560977), align=None)
        with Locations((19.915289206, -2.780238801)):
            Rectangle(SKETCH_6_W, SKETCH_6_H)
        Polygon((60.650271541, 91.323632381), (56.438010612, 88.8916824), (71.476544096, 62.844178335), (75.688805025, 65.276128316), align=None)
    extrude(amount=EXTRUDE_3_DEPTH)

    # 草圖7 → 填料-伸長4 (add)
    with BuildSketch(Plane(origin=(11.20571551, 0, 0), x_dir=(0, 0, -1), z_dir=(1, 0, 0))):
        Polygon((4.915289206, -0.348288819), (34.915289206, -0.348288819), (36.915289206, 40.580827444), (71.476544096, 62.844178335), (56.438010612, 88.8916824), (19.915289206, 70.114680442), (-16.6074322, 88.8916824), (-31.6074322, 62.910920287), (2.915289206, 40.669816713), align=None)
        with Locations((19.915289206, 50.484771289)):
            Circle(SKETCH_7_R, mode=Mode.SUBTRACT)
    extrude(amount=-EXTRUDE_4_DEPTH)

    # 草圖8 → 填料-伸長5 (add)
    with BuildSketch(Plane(origin=(11.20571551, 0, 0), x_dir=(0, 0, -1), z_dir=(1, 0, 0)).offset(EXTRUDE_START_3)):
        with Locations(Location((19.915289206, 50.484771289, 0), (0, 0, 209.748184736))):
            Circle(SKETCH_8_R)
        with Locations((19.915289206, 50.484771289)):
            Circle(SKETCH_8_R_2, mode=Mode.SUBTRACT)
    extrude(amount=-EXTRUDE_5_DEPTH)

    # 草圖9 → 除料-伸長4 (cut, through all)
    with BuildSketch(Plane.XY):
        with Locations((18.70571551, 50.484771289)):
            Circle(SKETCH_9_R)
    extrude(amount=-CUT_EXTRUDE_4_DEPTH, mode=Mode.SUBTRACT)

    # 草圖10 → 除料-伸長5 (cut)
    with BuildSketch(Plane(origin=(11.20571551, 0, 0), x_dir=(0, 0, -1), z_dir=(1, 0, 0))):
        Polygon((17.489472579, 14.095645642), (8.635822473, 26.014186948), (9.726460643, 3.646231166), align=None)
        Polygon((4.362874888, 72.488368192), (-15.553662135, 82.727825721), (-10.385709712, 70.780152937), align=None)
        with BuildLine():
            Line((19.981027019, 17.44940643), (26.954063356, 26.835473003))
            ThreePointArc((26.954063356, 26.835473003), (20.003346412, 25.81037369), (13.045489926, 26.785836528))
            Line((13.045489926, 26.785836528), (19.981027019, 17.44940643))
        make_face()
        Polygon((-19.953437634, 82.824030911), (-28.090922206, 68.729494185), (-14.535949667, 70.299462525), align=None)
        Polygon((22.472437105, 14.095538404), (31.188411686, 25.827689753), (30.112548712, 3.810629391), align=None)
        Polygon((-25.60433313, 64.990756457), (-7.074931027, 53.05050161), (-12.877284846, 66.464832691), align=None)
        with BuildLine():
            Line((-8.727044891, 66.945523102), (-4.084990966, 56.213663207))
            ThreePointArc((-4.084990966, 56.213663207), (-1.49739454, 62.745710311), (2.826309301, 68.283659365))
            Line((2.826309301, 68.283659365), (-8.727044891, 66.945523102))
        make_face()
        Polygon((11.843032254, -0.212188782), (28.1180014, -0.212188782), (19.980882665, 10.741777615), align=None)
        Polygon((46.747170258, 52.951758728), (65.573069111, 65.080256981), (52.642104752, 66.578515289), align=None)
        Polygon((67.856272998, 68.842471738), (59.718788426, 82.937008464), (54.300934622, 70.413073728), align=None)
        Polygon((55.237652037, 82.652928019), (35.632386961, 72.576122504), (50.15071536, 70.893942773), align=None)
        with BuildLine():
            Line((48.491885491, 67.059384335), (36.876795229, 68.405177657))
            ThreePointArc((36.876795229, 68.405177657), (41.239915747, 62.898229866), (43.874068392, 56.384817974))
            Line((43.874068392, 56.384817974), (48.491885491, 67.059384335))
        make_face()
    extrude(amount=-CUT_EXTRUDE_5_DEPTH, mode=Mode.SUBTRACT)


solid = part.part
